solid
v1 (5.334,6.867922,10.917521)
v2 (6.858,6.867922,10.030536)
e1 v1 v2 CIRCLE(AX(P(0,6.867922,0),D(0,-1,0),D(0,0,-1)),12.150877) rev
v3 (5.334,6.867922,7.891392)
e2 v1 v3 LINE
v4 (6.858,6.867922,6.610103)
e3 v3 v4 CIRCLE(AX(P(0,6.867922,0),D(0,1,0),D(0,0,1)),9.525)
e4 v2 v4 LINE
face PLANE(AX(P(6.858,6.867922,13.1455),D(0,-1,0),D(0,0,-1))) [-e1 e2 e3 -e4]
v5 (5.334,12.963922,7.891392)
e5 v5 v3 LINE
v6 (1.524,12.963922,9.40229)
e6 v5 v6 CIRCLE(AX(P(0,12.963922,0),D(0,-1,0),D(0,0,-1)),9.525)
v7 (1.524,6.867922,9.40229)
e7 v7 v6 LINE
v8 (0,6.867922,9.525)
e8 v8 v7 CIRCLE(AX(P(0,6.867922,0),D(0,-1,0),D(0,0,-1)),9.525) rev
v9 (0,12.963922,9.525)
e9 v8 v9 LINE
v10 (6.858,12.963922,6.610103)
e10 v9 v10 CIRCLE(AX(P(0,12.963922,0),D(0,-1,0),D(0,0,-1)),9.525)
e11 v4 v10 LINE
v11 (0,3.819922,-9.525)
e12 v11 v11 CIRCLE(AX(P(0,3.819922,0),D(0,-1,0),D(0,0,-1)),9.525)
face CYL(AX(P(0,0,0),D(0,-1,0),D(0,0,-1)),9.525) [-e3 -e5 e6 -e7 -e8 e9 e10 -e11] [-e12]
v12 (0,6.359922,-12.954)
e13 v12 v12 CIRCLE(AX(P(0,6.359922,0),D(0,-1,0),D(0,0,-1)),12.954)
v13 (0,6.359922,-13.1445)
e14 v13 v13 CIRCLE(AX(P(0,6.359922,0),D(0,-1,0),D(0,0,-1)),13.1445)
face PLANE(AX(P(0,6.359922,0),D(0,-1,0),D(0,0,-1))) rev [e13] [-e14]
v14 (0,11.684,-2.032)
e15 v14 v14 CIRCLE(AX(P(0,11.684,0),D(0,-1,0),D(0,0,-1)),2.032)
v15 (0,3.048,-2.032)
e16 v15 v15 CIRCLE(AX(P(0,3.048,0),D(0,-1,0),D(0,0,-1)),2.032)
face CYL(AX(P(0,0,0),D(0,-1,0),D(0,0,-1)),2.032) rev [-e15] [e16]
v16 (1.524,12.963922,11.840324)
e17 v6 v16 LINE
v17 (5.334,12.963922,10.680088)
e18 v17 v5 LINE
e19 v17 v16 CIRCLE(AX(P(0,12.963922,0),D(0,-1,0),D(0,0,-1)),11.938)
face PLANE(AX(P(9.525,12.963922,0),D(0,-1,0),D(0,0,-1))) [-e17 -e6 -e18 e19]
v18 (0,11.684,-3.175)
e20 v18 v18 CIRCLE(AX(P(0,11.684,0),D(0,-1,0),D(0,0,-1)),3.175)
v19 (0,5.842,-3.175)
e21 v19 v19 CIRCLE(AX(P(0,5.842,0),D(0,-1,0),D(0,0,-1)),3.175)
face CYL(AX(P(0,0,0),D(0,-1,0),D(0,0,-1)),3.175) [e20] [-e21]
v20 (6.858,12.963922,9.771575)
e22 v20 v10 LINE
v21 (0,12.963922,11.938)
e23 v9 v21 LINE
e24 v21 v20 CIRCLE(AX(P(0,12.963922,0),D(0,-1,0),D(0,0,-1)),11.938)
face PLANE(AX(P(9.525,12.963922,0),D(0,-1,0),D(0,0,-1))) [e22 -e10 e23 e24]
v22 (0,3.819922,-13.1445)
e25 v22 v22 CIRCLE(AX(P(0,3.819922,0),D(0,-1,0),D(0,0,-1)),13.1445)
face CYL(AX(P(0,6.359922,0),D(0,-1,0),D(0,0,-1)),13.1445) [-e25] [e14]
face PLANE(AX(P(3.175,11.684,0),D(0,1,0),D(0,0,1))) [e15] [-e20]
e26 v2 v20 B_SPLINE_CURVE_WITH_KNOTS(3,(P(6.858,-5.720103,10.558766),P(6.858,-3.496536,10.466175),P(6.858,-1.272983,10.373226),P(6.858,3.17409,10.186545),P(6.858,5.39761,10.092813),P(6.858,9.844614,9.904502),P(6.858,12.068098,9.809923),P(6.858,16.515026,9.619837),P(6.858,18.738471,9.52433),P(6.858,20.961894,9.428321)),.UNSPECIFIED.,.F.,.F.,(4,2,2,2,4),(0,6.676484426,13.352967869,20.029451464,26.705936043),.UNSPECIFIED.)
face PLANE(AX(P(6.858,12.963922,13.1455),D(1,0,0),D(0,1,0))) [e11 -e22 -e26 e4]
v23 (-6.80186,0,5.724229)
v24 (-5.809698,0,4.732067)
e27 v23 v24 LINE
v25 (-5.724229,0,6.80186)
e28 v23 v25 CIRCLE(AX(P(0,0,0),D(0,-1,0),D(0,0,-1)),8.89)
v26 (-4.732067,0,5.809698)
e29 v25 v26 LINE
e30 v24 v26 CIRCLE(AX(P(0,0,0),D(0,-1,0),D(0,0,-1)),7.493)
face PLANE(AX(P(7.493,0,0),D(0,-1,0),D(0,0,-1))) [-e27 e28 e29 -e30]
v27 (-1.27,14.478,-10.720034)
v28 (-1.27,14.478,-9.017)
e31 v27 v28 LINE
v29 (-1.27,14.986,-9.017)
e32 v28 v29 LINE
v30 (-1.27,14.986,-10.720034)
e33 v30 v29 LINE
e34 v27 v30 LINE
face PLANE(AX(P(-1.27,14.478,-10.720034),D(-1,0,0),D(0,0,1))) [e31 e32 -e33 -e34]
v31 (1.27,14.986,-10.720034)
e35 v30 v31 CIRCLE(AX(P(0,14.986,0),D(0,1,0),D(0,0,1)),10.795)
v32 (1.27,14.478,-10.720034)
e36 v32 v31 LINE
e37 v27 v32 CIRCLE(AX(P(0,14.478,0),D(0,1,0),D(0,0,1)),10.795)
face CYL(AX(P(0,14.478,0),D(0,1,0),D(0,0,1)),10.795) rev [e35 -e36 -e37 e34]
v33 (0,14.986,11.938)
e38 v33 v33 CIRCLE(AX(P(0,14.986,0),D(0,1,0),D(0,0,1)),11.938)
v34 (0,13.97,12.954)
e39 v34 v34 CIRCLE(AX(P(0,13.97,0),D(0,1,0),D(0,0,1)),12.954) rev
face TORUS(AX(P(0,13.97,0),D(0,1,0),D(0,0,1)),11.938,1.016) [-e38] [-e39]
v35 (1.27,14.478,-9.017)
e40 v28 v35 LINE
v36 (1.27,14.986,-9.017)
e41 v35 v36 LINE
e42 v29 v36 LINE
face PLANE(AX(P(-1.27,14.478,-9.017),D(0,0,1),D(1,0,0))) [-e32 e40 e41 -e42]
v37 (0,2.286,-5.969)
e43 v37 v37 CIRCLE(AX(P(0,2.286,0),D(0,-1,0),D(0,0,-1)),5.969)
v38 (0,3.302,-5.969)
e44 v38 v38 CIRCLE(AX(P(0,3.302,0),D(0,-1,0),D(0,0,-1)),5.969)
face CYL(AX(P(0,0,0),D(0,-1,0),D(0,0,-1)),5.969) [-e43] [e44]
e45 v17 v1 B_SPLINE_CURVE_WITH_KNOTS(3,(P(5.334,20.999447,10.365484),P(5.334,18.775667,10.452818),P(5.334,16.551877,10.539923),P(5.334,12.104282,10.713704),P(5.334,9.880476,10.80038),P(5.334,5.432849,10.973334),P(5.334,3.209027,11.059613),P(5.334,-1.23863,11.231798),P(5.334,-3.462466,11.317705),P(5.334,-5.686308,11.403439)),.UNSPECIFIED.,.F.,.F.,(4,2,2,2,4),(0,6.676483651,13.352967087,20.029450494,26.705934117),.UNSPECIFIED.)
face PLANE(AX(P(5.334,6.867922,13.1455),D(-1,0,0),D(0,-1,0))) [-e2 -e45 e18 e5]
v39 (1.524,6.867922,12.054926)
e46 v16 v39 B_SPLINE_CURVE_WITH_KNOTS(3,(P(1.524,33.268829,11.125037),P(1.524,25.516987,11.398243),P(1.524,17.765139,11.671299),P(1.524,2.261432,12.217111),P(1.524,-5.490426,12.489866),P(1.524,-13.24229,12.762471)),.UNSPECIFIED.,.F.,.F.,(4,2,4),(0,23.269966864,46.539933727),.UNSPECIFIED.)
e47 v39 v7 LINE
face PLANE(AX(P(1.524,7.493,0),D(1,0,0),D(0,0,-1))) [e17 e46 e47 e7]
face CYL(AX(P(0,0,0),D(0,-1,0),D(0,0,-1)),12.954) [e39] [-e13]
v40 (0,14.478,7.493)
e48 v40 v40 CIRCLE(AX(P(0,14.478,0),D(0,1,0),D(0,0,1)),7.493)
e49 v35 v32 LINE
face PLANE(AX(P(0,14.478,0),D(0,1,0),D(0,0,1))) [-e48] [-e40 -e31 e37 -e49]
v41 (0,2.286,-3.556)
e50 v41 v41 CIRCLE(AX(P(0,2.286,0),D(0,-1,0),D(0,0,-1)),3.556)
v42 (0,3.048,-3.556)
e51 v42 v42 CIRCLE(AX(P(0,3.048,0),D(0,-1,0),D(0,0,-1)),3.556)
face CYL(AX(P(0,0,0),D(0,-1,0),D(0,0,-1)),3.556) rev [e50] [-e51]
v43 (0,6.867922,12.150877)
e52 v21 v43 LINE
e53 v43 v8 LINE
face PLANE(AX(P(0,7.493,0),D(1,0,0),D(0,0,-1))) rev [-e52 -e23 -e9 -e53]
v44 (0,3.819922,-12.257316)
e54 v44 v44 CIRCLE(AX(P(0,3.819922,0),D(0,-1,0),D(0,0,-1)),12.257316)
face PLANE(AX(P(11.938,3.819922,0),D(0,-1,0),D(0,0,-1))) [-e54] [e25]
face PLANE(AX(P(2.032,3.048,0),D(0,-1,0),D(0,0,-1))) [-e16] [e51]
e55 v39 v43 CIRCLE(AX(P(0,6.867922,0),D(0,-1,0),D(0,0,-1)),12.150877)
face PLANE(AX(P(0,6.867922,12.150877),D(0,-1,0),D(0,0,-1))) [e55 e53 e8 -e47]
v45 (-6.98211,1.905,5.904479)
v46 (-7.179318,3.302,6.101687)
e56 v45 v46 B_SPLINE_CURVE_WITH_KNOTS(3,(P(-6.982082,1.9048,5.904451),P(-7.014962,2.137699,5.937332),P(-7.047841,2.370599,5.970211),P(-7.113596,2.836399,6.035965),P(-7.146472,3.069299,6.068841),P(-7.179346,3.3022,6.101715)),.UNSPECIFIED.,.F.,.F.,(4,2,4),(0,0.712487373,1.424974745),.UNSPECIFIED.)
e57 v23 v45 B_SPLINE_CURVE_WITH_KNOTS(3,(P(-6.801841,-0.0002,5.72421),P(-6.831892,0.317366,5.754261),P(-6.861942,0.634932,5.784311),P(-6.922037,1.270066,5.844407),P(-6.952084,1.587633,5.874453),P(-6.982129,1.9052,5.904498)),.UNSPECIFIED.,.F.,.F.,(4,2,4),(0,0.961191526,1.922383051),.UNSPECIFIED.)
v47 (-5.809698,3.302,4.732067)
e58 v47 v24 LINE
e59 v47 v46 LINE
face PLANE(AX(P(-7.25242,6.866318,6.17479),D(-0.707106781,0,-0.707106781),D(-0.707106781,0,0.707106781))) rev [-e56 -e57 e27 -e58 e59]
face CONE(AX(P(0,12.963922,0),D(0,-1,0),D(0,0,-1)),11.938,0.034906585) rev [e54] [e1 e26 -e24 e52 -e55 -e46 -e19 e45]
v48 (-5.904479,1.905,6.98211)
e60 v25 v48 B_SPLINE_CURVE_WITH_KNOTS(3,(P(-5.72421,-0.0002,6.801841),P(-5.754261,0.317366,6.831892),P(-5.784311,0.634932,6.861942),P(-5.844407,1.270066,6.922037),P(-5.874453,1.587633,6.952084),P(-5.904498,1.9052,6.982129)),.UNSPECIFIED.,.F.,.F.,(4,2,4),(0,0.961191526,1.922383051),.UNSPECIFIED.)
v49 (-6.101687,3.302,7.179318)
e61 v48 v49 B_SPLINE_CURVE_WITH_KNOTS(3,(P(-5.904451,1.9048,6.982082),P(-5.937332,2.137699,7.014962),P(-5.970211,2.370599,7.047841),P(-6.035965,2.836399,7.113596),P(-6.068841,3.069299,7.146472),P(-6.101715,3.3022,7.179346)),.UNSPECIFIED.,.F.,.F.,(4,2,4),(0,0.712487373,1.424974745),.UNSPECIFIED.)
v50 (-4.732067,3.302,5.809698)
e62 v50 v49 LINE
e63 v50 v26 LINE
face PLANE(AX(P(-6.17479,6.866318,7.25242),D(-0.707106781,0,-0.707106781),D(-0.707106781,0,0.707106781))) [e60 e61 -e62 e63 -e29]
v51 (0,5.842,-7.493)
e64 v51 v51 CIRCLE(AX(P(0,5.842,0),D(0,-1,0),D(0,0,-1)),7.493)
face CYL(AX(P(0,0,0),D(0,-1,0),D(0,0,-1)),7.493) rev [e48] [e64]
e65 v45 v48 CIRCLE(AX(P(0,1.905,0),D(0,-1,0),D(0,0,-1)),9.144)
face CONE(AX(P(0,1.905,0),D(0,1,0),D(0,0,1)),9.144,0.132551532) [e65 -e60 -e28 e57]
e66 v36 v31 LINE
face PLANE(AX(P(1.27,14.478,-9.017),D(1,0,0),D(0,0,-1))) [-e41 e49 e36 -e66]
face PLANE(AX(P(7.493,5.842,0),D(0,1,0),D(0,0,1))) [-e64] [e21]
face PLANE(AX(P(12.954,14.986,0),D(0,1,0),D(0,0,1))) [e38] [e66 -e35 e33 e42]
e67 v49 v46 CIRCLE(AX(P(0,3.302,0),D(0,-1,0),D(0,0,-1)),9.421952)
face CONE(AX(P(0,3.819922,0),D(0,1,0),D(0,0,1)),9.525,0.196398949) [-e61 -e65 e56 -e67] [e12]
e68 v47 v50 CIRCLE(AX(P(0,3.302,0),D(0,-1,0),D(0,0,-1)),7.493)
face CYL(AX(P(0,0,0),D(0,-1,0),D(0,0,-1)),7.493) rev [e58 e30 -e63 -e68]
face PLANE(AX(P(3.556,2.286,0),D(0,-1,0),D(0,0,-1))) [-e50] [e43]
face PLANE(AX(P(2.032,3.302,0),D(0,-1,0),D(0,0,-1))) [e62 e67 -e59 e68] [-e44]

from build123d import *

# Parameters (mm, degrees)
FILLET1_R                            = 1.016
BOSS_EXTRUDE1_START                  = -2.54
SKETCH2_R                            = 13.1445
SKETCH2_R_2                          = 12.954
BOSS_EXTRUDE1_DEPTH                  = 2.54
CUT_EXTRUDE1_START                   = -0.508
SKETCH3_R                            = 7.493
CUT_EXTRUDE1_DEPTH                   = 0.508
CUT_EXTRUDE2_START                   = -3.302
CUT_EXTRUDE2_DEPTH                   = 3.302
RIB1_REACH                           = 25.878
SKETCH7_WALL_W                       = 52.380916808
SKETCH7_WALL_H                       = 1.524
BOSS_EXTRUDE2_REACH                  = 32.187
SKETCH9_W                            = 1.524
SKETCH9_H                            = 6.096
BOSS_EXTRUDE2_DIRECTION_2_REACH      = 32.187
BOSS_EXTRUDE2_DIRECTION_2_END_RADIUS = 9.525


# Read off the part's stored shape, not the designer's step: Draft1
with BuildPart() as part:
    # Sketch1 → Base-Revolve (revolve)
    with BuildSketch(Plane.XY, mode=Mode.PRIVATE) as base_revolve_sk:
        Polygon((12.954, 3.819921875), (12.954, 14.986), (7.493, 14.986), (7.493, 5.842), (3.175, 5.842), (3.175, 11.684), (2.032, 11.684), (2.032, 3.302), (7.493, 3.302), (7.493, 0), (9.525, 0), (9.525, 12.963921875), (11.938, 12.963921875), (11.938, 3.819921875), align=None)
    revolve(base_revolve_sk.sketch.rotate(Axis((0, 0, 0), (0, 1, 0)), 90), axis=Axis((0, 0, 0), (0, 1, 0)))

    # Fillet1
    fillet1_edges = [part.edges().sort_by_distance(p)[0] for p in [
        (0, 14.986, 12.954),
    ]]
    fillet(fillet1_edges, radius=FILLET1_R)

    # Sketch2 → Boss-Extrude1 (add)
    with BuildSketch(Plane.XZ.offset(-3.819921875).offset(BOSS_EXTRUDE1_START)):
        with Locations(Location((0, 0, 0), (0, 0, 270))):
            Circle(SKETCH2_R)
        with Locations(Location((0, 0, 0), (0, 0, 270))):
            Circle(SKETCH2_R_2, mode=Mode.SUBTRACT)
    extrude(amount=BOSS_EXTRUDE1_DEPTH)

    # Sketch3 → Cut-Extrude1 (cut)
    with BuildSketch(Plane(origin=(0, 14.986, 0), x_dir=(-1, 0, 0), z_dir=(0, 1, 0)).offset(CUT_EXTRUDE1_START)):
        with BuildLine():
            Line((1.27, -10.720033815), (1.27, -9.017))
            Line((1.27, -9.017), (-1.27, -9.017))
            Line((-1.27, -9.017), (-1.27, -10.720033815))
            ThreePointArc((-1.27, -10.720033815), (0, 10.795), (1.27, -10.720033815))
        make_face()
        with Locations(Location((0, 0, 0), (0, 0, 270))):
            Circle(SKETCH3_R, mode=Mode.SUBTRACT)
    extrude(amount=CUT_EXTRUDE1_DEPTH, mode=Mode.SUBTRACT)

    # Draft1 outline → Draft1 (revolve, cut)
    with BuildSketch(Plane.XY):
        Polygon((12.257315516, 3.819921875), (11.938, 12.963921875), (11.938, 3.819921875), align=None)
    revolve(axis=Axis((0, 0, 0), (0, 1, 0)), mode=Mode.SUBTRACT)

    # Sketch4 → Cut-Revolve1 (revolve, cut)
    with BuildSketch(Plane.XY, mode=Mode.PRIVATE) as cut_revolve1_sk:
        Polygon((9.525, 3.819921875), (9.144, 1.905), (8.89, 0), (9.525, 0), align=None)
    revolve(cut_revolve1_sk.sketch.rotate(Axis((0, 0, 0), (0, 1, 0)), 90), axis=Axis((0, 0, 0), (0, 1, 0)), mode=Mode.SUBTRACT)

    # Sketch5 → Boss-Revolve1 (revolve)
    with BuildSketch(Plane.XY, mode=Mode.PRIVATE) as boss_revolve1_sk:
        Polygon((2.032, 3.302), (2.032, 3.048), (3.556, 3.048), (3.556, 2.286), (5.969, 2.286), (5.969, 3.302), align=None)
    revolve(boss_revolve1_sk.sketch.rotate(Axis((0, 0, 0), (0, 1, 0)), 90), axis=Axis((0, 0, 0), (0, 1, 0)))

    # Sketch6 → Cut-Extrude2 (cut)
    with BuildSketch(Plane.XZ.offset(CUT_EXTRUDE2_START)):
        with BuildLine():
            Line((-6.174789514, 7.252420248), (-4.732067149, 5.809697884))
            ThreePointArc((-4.732067149, 5.809697884), (-5.298351111, 5.298351111), (-5.809697884, 4.732067149))
            Line((-5.809697884, 4.732067149), (-7.252420248, 6.174789514))
            ThreePointArc((-7.252420248, 6.174789514), (-6.735192091, 6.735192091), (-6.174789514, 7.252420248))
        make_face()
    extrude(amount=CUT_EXTRUDE2_DEPTH, mode=Mode.SUBTRACT)

    # Sketch7 wall → Rib1 (add, up to next)
    with BuildSketch(Plane(origin=(0, 6.867921875, 10.837938506), x_dir=(0, 0, -1), z_dir=(0, 1, 0)), mode=Mode.PRIVATE) as rib1_sk1:
        with Locations((0, -0.762)):
            Rectangle(SKETCH7_WALL_W, SKETCH7_WALL_H)
    rib1_tool1 = extrude(rib1_sk1.sketch, amount=RIB1_REACH, mode=Mode.PRIVATE) - part.part
    add(rib1_tool1.solids().sort_by_distance((0, 6.867921875, 10.837938506))[0])

    # Boss-Extrude2: up to this cone (the profile starts inside it)
    boss_extrude2_end = Plane(origin=(0, 9.915922, 0), z_dir=(0, -1, 0)) * Cone(10.482382248, 13.606494754, 89.462877002, mode=Mode.PRIVATE)
    # Sketch9 → Boss-Extrude2 (add, up to the surface)
    with BuildSketch(Plane.XY.offset(9.525), mode=Mode.PRIVATE) as boss_extrude2_sk1:
        with Locations((6.096, 9.915921875)):
            Rectangle(SKETCH9_W, SKETCH9_H)
    boss_extrude2_tool1 = extrude(boss_extrude2_sk1.sketch, amount=BOSS_EXTRUDE2_REACH, mode=Mode.PRIVATE) & boss_extrude2_end
    add(boss_extrude2_tool1.solids().sort_by_distance((6.096, 9.915922, 9.525))[0])

    # Boss-Extrude2 direction 2: up to this cylinder (the profile starts outside it)
    boss_extrude2_direction_2_end = Plane(origin=(0, 9.915922, 0), z_dir=(0, -1, 0)) * Cylinder(BOSS_EXTRUDE2_DIRECTION_2_END_RADIUS, 84.424, mode=Mode.PRIVATE)
    # Sketch9 → Boss-Extrude2 direction 2 (add, up to the surface)
    with BuildSketch(Plane.XY.offset(9.525), mode=Mode.PRIVATE) as boss_extrude2_direction_2_sk1:
        with Locations((6.096, 9.915921875)):
            Rectangle(SKETCH9_W, SKETCH9_H)
    boss_extrude2_direction_2_tool1 = extrude(boss_extrude2_direction_2_sk1.sketch, amount=-BOSS_EXTRUDE2_DIRECTION_2_REACH, mode=Mode.PRIVATE) - boss_extrude2_direction_2_end
    add(boss_extrude2_direction_2_tool1.solids().sort_by_distance((6.096, 9.915922, 9.525))[0])


solid = part.part
